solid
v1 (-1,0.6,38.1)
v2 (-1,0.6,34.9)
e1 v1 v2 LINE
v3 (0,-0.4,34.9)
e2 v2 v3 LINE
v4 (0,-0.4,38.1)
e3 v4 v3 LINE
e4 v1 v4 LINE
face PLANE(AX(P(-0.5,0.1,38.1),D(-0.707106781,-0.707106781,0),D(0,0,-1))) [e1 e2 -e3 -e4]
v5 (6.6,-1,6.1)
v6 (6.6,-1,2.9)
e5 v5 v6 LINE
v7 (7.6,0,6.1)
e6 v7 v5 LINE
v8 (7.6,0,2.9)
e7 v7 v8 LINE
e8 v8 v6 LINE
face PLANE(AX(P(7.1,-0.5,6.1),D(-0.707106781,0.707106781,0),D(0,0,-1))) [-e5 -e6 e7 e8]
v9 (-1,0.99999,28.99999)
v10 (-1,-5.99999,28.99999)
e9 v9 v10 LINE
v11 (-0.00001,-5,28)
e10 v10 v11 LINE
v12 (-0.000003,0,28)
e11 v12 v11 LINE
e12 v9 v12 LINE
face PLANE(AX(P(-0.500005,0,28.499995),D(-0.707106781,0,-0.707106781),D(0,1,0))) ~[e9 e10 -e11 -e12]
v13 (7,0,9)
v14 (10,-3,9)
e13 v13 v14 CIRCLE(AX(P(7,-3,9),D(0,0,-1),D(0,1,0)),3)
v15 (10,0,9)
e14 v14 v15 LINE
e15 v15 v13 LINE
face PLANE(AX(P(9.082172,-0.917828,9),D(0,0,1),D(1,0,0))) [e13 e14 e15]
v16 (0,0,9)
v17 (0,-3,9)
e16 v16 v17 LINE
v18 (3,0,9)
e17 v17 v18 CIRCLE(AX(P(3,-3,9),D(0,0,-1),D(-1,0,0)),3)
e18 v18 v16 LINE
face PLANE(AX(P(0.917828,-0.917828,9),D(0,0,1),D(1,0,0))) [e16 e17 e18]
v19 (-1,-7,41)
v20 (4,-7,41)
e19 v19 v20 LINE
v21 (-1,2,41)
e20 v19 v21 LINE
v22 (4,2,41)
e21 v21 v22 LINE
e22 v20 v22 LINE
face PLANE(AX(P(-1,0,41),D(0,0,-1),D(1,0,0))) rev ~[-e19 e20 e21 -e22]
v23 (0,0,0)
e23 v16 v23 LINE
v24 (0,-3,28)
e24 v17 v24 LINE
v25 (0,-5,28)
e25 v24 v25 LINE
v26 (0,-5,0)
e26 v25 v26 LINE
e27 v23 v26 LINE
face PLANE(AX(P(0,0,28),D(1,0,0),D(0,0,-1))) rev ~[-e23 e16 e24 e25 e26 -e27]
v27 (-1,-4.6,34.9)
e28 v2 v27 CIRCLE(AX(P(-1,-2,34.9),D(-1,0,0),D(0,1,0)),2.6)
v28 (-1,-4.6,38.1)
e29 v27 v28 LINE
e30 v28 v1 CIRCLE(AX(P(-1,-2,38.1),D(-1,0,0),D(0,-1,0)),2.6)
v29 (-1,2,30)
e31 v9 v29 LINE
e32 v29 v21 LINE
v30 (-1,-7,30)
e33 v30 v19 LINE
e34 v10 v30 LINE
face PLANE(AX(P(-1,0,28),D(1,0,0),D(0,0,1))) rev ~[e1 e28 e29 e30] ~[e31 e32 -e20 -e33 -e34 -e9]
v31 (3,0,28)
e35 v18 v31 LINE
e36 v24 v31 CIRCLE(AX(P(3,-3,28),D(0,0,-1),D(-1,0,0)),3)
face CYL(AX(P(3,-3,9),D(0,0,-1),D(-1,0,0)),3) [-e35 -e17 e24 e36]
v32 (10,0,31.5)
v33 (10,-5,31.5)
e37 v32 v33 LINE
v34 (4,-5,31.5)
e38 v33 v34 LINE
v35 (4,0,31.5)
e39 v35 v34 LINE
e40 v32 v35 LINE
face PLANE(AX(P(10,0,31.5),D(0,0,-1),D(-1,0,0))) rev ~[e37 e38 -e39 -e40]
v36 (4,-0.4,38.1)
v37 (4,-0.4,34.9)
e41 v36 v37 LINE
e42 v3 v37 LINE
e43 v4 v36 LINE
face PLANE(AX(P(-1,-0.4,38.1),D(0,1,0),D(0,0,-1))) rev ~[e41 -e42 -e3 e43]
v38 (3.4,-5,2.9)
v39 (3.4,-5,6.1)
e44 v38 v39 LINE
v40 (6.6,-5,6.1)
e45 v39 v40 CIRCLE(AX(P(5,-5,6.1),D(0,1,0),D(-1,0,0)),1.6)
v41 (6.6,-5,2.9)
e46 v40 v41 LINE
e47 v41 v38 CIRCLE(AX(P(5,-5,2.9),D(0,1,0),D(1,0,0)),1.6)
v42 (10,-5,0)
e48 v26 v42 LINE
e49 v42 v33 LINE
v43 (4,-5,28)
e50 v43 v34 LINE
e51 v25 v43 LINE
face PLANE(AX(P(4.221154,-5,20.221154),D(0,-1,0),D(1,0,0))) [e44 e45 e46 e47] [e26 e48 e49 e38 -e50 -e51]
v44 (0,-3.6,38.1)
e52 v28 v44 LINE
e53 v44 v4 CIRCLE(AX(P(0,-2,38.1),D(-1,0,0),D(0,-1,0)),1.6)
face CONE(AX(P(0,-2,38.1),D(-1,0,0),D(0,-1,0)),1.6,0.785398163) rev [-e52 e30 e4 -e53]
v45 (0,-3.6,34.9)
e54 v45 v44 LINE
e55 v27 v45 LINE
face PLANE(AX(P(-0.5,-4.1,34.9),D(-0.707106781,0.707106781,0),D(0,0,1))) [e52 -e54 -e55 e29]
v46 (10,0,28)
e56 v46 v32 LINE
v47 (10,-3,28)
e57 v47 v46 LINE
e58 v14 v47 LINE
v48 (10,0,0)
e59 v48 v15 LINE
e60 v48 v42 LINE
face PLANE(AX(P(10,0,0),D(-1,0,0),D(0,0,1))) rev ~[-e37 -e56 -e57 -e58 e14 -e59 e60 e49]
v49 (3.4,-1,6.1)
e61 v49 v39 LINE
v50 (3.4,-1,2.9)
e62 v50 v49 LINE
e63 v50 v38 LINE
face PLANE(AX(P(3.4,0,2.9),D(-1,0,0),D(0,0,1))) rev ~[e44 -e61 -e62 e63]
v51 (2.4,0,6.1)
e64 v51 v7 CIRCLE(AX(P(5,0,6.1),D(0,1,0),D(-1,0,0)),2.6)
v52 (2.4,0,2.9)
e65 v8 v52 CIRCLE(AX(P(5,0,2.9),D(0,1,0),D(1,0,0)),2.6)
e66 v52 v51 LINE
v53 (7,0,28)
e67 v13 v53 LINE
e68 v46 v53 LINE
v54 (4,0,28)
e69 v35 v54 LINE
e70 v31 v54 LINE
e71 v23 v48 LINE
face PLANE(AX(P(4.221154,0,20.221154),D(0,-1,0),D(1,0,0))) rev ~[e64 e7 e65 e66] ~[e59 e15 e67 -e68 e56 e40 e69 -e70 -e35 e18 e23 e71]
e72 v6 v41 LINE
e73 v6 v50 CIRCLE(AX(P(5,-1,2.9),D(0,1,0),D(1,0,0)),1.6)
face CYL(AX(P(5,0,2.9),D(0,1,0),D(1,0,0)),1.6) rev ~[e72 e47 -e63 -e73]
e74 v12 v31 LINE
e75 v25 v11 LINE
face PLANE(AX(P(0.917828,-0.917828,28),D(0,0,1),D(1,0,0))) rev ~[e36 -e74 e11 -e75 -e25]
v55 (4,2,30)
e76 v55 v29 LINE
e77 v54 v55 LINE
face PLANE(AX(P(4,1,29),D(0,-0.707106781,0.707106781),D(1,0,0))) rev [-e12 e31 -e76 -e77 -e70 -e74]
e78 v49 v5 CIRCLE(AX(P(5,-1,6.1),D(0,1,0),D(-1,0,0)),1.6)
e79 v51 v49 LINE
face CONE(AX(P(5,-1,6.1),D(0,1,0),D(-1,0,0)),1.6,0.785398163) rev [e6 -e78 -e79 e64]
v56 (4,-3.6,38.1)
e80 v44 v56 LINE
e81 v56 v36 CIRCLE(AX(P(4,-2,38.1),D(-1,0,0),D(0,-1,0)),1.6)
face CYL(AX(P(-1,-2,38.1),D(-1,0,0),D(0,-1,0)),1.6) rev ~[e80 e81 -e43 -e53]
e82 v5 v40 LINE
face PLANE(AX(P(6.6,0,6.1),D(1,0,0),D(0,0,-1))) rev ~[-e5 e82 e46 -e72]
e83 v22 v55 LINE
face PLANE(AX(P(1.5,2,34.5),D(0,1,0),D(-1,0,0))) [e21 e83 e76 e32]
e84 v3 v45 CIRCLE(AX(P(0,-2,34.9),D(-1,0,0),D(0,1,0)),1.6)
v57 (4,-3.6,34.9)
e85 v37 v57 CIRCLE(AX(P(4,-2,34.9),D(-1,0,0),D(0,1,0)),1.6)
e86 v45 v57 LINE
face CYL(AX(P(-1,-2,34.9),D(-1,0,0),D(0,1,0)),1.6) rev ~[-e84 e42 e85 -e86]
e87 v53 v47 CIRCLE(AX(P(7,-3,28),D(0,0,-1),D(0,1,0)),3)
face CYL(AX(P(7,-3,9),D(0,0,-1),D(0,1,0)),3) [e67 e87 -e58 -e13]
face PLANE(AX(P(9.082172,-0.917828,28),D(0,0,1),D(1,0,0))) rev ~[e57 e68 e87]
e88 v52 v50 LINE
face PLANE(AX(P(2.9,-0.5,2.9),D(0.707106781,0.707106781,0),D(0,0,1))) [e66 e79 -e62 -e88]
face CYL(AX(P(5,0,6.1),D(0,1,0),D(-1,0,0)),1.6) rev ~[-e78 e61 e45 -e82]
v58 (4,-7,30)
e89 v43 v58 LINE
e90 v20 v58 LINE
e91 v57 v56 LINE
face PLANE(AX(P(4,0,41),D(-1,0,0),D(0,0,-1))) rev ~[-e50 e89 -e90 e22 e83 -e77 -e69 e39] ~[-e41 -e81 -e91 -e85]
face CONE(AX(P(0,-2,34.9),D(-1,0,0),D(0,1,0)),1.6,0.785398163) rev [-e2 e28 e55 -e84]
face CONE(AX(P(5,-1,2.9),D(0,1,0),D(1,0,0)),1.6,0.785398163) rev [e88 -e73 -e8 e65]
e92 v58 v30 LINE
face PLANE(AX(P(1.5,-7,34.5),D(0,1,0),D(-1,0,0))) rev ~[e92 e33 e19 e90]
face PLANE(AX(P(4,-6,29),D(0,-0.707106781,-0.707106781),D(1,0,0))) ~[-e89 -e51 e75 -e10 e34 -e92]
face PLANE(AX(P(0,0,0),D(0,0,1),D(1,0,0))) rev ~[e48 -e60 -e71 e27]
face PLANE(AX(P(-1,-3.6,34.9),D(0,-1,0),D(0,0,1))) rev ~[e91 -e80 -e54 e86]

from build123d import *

# Parameters (mm, degrees)
F1_DEPTH      = 5
F4_DEPTH      = 2
F4_DEPTH_BACK = 7
F6_DEPTH      = 25
F7_SIZE       = 2
F8_SIZE       = 0.99999
F10_DEPTH     = 19
F11_SIZE      = 1


# Not quite as in the source:
# - a fillet or chamfer is up to 0.001 mm smaller than in the source, because OpenCascade refuses the exact size


with BuildPart() as f1:
    # F0 (on Front) → F1 (new body)
    with BuildSketch(Plane.XZ):
        Polygon((0, 28), (0, 0), (10, 0), (10, 31.5), (4, 31.5), (4, 41), (-1, 41), (-1, 28), align=None)
        with BuildLine():
            ThreePointArc((3.4, 6.1), (5, 7.7), (6.6, 6.1))
            Line((6.6, 6.1), (6.6, 2.9))
            ThreePointArc((6.6, 2.9), (5, 1.3), (3.4, 2.9))
            Line((3.4, 2.9), (3.4, 6.1))
        make_face(mode=Mode.SUBTRACT)
    extrude(amount=F1_DEPTH)

    # F3 (on face) → F4 (join, two sides)
    with BuildSketch(Plane(origin=(0, 0, 0), x_dir=(-1, 0, 0), z_dir=(0, 1, 0))) as f4_sk:
        Polygon((1, 28), (1, 41), (-4, 41), (-4, 31.5), (-4, 28), (0, 28), align=None)
    extrude(amount=F4_DEPTH)
    extrude(f4_sk.sketch, amount=-F4_DEPTH_BACK)

    # F5 (on face) → F6 (cut)
    with BuildSketch(Plane(origin=(-1, 0, 0), x_dir=(0, -1, 0), z_dir=(-1, 0, 0))):
        with BuildLine():
            Line((3.6, 34.9), (3.6, 38.1))
            ThreePointArc((3.6, 38.1), (2, 39.7), (0.4, 38.1))
            Line((0.4, 38.1), (0.4, 34.9))
            ThreePointArc((0.4, 34.9), (2, 33.3), (3.6, 34.9))
        make_face()
    extrude(amount=-F6_DEPTH, mode=Mode.SUBTRACT)

    # F7
    f7_edges = [f1.edges().sort_by_distance(p)[0] for p in [
        (1.5, 2, 28),
        (1.5, -7, 28),
    ]]
    chamfer(f7_edges, length=F7_SIZE)

    # F8 (size 1 in the source; OpenCascade refuses exactly that, so slightly less here)
    f8_edges = [f1.edges().sort_by_distance(p)[0] for p in [
        (-1, -2.5, 28),
    ]]
    chamfer(f8_edges, length=F8_SIZE)

    # F9 (on offset) → F10 (cut)
    with BuildSketch(Plane.XY.offset(9)):
        with BuildLine():
            Line((10, 0), (7, 0))
            ThreePointArc((7, 0), (9.1213203436, -0.8786796564), (10, -3))
            Line((10, -3), (10, 0))
        make_face()
        with BuildLine():
            ThreePointArc((0, -3), (0.8786796564, -0.8786796564), (3, 0))
            Line((3, 0), (0, 0))
            Line((0, 0), (0, -3))
        make_face()
    extrude(amount=F10_DEPTH, mode=Mode.SUBTRACT)

    # F11
    f11_edges = [f1.edges().sort_by_distance(p)[0] for p in [
        (6.6, 0, 4.5),
        (-1, -3.6, 36.5),
    ]]
    chamfer(f11_edges, length=F11_SIZE)


solid = f1.part
